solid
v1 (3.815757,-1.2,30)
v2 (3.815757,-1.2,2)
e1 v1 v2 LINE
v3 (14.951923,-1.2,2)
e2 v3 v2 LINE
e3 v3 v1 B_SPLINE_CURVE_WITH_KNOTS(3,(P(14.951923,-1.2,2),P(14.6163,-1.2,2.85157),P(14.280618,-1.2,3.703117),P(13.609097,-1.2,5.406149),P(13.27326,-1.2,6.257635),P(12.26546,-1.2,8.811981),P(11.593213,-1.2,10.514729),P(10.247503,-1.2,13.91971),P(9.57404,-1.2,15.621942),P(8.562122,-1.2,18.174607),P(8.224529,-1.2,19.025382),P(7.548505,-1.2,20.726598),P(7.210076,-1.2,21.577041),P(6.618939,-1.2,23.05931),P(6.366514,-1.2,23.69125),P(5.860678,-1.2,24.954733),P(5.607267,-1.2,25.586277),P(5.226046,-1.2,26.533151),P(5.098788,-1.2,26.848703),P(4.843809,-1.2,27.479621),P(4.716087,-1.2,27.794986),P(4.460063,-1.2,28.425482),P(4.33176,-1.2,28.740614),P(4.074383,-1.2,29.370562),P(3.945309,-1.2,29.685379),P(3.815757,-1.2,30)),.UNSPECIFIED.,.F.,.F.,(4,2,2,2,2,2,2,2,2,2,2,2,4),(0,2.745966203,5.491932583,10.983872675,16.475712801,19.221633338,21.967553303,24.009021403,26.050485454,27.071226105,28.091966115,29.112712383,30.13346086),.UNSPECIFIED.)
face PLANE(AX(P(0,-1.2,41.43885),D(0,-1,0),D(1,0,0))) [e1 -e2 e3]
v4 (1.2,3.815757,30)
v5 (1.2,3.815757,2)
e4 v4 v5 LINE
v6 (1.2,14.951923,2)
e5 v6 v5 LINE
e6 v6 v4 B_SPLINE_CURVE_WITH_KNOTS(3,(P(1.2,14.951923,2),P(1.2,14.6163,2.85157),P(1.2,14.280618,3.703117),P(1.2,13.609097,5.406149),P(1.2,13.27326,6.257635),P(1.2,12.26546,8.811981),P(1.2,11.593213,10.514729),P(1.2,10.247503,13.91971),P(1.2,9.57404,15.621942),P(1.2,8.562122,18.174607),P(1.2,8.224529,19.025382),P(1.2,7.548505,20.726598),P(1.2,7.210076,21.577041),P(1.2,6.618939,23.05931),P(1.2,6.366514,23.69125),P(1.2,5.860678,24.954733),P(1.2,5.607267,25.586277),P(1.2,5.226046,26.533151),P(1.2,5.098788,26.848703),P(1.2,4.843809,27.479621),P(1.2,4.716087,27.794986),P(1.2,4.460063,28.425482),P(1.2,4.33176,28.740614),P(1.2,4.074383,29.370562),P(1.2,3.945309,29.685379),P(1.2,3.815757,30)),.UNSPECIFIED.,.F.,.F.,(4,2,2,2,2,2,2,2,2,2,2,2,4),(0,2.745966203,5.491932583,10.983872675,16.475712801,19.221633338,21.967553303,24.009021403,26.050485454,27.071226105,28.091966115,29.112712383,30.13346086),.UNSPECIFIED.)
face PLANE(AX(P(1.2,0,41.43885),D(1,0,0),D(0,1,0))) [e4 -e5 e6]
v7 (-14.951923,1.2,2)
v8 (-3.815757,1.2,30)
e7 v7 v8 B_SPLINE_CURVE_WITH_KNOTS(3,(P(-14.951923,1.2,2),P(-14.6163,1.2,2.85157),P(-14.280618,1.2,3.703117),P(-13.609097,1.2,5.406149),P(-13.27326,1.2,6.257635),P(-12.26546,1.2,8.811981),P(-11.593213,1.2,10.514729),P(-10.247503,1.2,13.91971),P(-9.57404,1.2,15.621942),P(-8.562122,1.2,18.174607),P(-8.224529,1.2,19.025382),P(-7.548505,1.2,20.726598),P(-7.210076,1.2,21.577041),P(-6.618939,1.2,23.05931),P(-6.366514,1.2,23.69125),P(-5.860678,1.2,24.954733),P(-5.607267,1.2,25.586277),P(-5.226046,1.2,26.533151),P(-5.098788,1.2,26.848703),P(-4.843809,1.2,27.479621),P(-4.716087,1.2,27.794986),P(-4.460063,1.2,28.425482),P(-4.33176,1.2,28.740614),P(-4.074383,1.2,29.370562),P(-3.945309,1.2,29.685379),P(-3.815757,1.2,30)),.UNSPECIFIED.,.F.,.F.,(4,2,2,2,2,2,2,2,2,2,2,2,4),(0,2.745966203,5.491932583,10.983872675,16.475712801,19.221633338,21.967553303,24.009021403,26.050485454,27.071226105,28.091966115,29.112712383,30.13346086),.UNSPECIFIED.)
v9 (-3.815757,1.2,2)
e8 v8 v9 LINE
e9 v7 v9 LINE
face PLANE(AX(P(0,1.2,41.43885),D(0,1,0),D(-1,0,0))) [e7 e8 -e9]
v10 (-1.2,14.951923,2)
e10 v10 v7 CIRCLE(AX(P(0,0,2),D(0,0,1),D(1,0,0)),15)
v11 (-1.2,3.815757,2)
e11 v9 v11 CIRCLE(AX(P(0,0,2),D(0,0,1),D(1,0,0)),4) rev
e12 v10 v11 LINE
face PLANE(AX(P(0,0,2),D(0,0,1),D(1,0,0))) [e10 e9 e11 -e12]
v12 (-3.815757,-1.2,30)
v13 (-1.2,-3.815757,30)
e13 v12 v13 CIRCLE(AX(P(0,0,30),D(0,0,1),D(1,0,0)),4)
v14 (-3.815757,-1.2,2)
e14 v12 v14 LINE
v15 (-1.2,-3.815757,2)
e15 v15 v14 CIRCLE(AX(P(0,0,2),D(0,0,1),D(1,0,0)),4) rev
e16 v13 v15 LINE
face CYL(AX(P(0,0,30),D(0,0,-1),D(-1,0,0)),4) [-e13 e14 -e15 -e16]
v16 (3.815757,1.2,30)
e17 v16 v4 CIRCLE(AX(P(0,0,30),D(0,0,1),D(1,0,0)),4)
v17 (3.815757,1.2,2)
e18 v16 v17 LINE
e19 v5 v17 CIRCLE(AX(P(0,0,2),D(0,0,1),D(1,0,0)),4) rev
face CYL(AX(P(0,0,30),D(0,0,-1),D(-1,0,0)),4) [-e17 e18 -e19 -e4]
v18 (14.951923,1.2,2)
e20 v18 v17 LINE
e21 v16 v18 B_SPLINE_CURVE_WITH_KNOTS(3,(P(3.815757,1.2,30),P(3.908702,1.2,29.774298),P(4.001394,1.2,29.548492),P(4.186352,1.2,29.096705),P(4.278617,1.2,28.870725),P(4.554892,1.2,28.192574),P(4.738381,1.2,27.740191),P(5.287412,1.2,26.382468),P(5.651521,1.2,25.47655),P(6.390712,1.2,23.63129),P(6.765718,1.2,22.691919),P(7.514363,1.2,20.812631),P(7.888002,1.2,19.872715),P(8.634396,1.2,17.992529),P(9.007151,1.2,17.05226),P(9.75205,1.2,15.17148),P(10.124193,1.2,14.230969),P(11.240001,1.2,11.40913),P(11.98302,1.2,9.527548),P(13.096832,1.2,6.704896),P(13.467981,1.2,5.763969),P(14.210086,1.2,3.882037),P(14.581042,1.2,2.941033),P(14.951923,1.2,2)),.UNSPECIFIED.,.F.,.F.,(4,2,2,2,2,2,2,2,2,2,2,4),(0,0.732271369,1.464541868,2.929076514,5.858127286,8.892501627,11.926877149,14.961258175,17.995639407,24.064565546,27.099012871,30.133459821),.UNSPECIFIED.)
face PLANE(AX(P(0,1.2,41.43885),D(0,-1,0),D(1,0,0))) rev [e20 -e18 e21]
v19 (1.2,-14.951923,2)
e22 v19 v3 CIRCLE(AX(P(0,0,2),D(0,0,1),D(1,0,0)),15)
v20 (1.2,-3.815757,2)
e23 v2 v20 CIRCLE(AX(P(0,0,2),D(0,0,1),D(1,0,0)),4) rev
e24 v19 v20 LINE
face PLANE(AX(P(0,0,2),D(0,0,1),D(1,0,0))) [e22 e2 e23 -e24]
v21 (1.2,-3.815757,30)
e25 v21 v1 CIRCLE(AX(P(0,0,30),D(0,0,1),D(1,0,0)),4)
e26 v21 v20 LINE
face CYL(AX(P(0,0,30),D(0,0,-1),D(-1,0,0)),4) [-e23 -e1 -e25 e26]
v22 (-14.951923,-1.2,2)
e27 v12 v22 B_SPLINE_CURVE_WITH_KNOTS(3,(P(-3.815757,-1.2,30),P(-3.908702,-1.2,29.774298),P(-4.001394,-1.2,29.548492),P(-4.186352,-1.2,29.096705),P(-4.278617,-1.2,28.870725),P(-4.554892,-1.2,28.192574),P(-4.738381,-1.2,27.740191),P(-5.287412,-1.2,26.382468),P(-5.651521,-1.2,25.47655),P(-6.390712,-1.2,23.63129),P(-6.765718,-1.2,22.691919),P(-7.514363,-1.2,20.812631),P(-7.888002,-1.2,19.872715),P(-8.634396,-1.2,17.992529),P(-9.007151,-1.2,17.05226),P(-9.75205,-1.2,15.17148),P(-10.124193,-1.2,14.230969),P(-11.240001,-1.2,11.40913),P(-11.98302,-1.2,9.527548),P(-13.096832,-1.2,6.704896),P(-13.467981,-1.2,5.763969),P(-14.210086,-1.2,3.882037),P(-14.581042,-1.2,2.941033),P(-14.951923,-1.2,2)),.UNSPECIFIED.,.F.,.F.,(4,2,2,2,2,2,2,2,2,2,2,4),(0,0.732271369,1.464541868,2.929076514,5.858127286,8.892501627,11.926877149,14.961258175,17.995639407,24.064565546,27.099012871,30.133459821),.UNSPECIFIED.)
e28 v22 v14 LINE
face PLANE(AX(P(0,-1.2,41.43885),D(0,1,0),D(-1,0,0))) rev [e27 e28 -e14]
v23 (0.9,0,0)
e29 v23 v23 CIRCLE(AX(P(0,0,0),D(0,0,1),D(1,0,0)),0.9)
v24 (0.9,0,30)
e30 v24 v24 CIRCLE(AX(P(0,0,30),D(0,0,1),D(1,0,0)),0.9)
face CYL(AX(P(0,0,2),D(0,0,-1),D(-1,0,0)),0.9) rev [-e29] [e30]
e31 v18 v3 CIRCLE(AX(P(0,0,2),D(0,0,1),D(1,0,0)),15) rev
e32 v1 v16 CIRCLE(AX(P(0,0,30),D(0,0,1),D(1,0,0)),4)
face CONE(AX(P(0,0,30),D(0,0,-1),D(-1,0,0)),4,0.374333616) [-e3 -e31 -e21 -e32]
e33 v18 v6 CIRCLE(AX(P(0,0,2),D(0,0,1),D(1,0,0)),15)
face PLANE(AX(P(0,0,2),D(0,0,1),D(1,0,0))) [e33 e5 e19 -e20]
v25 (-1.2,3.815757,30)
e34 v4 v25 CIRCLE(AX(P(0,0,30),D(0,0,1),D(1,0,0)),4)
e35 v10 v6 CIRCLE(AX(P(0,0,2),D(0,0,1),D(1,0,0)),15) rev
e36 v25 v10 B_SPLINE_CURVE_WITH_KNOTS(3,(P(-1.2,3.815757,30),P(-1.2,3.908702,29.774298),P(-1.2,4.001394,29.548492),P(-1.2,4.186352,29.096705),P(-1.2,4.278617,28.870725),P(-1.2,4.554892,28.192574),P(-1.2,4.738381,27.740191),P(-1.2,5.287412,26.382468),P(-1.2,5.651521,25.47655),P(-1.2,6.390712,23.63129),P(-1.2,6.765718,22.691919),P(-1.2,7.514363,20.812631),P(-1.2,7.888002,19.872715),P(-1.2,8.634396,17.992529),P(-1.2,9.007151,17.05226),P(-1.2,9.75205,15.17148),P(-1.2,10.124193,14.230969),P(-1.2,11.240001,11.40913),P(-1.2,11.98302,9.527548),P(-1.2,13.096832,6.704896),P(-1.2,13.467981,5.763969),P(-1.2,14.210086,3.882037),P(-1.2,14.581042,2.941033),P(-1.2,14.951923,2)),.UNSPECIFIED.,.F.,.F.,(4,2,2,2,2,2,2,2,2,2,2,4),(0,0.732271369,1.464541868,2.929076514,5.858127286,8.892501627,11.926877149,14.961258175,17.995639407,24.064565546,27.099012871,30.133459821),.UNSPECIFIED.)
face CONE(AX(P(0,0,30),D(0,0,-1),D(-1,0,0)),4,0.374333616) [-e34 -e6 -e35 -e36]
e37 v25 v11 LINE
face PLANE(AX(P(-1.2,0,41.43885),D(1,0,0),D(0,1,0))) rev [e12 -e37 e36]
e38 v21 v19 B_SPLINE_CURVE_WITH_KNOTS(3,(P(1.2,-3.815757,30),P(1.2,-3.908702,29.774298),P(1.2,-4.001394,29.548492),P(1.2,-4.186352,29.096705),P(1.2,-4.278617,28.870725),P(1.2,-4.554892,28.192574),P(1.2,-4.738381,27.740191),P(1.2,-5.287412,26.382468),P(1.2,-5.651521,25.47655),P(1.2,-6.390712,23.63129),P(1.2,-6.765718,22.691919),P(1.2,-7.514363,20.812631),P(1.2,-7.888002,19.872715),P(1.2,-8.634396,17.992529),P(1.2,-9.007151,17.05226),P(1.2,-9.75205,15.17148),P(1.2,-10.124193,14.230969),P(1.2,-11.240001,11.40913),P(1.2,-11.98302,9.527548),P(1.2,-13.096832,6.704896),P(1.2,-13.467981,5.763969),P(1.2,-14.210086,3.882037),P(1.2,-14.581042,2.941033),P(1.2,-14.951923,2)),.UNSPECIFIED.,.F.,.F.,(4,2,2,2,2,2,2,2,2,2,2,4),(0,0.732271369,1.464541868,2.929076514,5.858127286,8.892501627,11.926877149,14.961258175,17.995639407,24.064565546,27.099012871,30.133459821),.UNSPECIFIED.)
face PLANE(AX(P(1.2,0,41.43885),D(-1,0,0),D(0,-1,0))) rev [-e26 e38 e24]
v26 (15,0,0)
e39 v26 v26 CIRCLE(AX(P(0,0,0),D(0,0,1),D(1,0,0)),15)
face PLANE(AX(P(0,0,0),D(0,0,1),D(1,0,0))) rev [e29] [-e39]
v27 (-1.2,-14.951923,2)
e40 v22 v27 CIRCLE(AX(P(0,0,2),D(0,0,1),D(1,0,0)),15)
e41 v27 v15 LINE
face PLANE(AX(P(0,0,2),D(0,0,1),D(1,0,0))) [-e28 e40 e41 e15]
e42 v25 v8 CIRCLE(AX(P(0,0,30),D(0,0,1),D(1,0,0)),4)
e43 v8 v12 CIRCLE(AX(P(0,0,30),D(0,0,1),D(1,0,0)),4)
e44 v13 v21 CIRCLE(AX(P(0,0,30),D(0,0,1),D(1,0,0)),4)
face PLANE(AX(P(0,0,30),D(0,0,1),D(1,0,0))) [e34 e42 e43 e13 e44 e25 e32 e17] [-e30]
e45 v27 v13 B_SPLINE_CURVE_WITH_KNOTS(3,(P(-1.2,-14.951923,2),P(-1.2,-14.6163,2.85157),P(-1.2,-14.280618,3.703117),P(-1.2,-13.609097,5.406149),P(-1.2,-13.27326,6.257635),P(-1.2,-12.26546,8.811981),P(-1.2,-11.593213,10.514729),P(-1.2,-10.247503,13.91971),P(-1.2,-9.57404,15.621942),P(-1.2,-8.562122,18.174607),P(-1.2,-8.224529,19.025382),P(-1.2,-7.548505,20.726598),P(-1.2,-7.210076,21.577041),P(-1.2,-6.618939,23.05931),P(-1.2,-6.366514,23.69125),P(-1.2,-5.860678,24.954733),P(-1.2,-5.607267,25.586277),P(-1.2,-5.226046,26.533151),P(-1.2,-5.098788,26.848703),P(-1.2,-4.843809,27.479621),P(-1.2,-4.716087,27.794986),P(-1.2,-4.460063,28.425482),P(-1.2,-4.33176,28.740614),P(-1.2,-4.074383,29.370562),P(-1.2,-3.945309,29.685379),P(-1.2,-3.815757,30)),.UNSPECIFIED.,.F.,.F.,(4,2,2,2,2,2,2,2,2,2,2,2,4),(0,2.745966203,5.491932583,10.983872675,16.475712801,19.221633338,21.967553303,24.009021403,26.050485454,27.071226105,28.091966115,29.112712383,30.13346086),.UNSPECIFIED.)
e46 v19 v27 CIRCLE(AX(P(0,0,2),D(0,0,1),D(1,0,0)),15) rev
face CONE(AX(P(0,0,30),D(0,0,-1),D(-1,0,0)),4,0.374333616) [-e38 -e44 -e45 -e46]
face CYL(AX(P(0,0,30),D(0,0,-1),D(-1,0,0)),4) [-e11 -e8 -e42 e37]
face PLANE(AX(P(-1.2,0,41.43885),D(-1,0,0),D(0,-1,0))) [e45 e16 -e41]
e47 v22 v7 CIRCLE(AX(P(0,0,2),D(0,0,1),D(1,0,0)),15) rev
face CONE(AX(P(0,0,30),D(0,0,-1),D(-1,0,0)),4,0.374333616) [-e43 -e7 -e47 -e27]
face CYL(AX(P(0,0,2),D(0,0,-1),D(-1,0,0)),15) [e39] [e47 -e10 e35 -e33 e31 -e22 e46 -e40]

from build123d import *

# Parameters (mm, degrees)
SKETCH1_R           = 15
SKETCH1_R_2         = 0.9
BOSS_EXTRUDE1_DEPTH = 2
SKETCH1_3_R         = 4
SKETCH1_3_R_2       = 0.9
BOSS_EXTRUDE2_DEPTH = 30
BOSS_EXTRUDE3_DEPTH = 28
CHAMFER1_SIZE       = 28
CHAMFER1_SIZE_2     = 11


with BuildPart() as part:
    # Sketch1 → Boss-Extrude1 (new body)
    with BuildSketch(Plane.XY):
        Circle(SKETCH1_R)
        Circle(SKETCH1_R_2, mode=Mode.SUBTRACT)
    extrude(amount=BOSS_EXTRUDE1_DEPTH)

    # Sketch1<3> → Boss-Extrude2 (add)
    with BuildSketch(Plane.XY):
        Circle(SKETCH1_3_R)
        Circle(SKETCH1_3_R_2, mode=Mode.SUBTRACT)
    extrude(amount=BOSS_EXTRUDE2_DEPTH)

    # Sketch2 → Boss-Extrude3 (add)
    with BuildSketch(Plane.XY.offset(2)):
        with BuildLine():
            ThreePointArc((1.2, 14.951922953), (0, 15), (-1.2, 14.951922953))
            Line((-1.2, 14.951922953), (-1.2, 3.815756806))
            ThreePointArc((-1.2, 3.815756806), (0, 4), (1.2, 3.815756806))
            Line((1.2, 3.815756806), (1.2, 14.951922953))
        make_face()
        with BuildLine():
            Line((-3.815756806, 1.2), (-14.951922953, 1.2))
            ThreePointArc((-14.951922953, 1.2), (-15, 0), (-14.951922953, -1.2))
            Line((-14.951922953, -1.2), (-3.815756806, -1.2))
            ThreePointArc((-3.815756806, -1.2), (-4, 0), (-3.815756806, 1.2))
        make_face()
        with BuildLine():
            ThreePointArc((14.951922953, -1.2), (15, 0), (14.951922953, 1.2))
            Line((14.951922953, 1.2), (3.815756806, 1.2))
            ThreePointArc((3.815756806, 1.2), (4, 0), (3.815756806, -1.2))
            Line((3.815756806, -1.2), (14.951922953, -1.2))
        make_face()
        with BuildLine():
            Line((-1.2, -3.815756806), (-1.2, -14.951922953))
            ThreePointArc((-1.2, -14.951922953), (0, -15), (1.2, -14.951922953))
            Line((1.2, -14.951922953), (1.2, -3.815756806))
            ThreePointArc((1.2, -3.815756806), (0, -4), (-1.2, -3.815756806))
        make_face()
    extrude(amount=BOSS_EXTRUDE3_DEPTH)

    # Chamfer1
    # the kernel refuses this chamfer: 28, 11 mm, written as the material it takes off along each edge
    with BuildSketch(Plane(origin=(0, 0, 30), x_dir=(0.9999950652018581, 0.0031415874858912577, 0), z_dir=(0.0031415874858912577, -0.9999950652018581, 0))) as chamfer1_piece_1:
        Polygon((15, -CHAMFER1_SIZE), (15 - CHAMFER1_SIZE_2, 0), (15, 0), align=None)
    revolve(axis=Axis((0, 0, 30), (0, 0, 1)), revolution_arc=359.64, mode=Mode.SUBTRACT)
    with BuildSketch(Plane(origin=(0, 0, 30), x_dir=(0.0031415874858795345, -0.9999950652018582, 0), z_dir=(-0.9999950652018582, -0.0031415874858795345, 0))) as chamfer1_piece_2:
        Polygon((15, -CHAMFER1_SIZE), (15 - CHAMFER1_SIZE_2, 0), (15, 0), align=None)
    revolve(axis=Axis((0, 0, 30), (0, 0, 1)), revolution_arc=359.64, mode=Mode.SUBTRACT)
    with BuildSketch(Plane(origin=(0, 0, 30), x_dir=(-0.9999950652018582, -0.00314158748587628, 0), z_dir=(-0.00314158748587628, 0.9999950652018582, 0))) as chamfer1_piece_3:
        Polygon((15, -CHAMFER1_SIZE), (15 - CHAMFER1_SIZE_2, 0), (15, 0), align=None)
    revolve(axis=Axis((0, 0, 30), (0, 0, 1)), revolution_arc=359.64, mode=Mode.SUBTRACT)
    with BuildSketch(Plane(origin=(0, 0, 30), x_dir=(-0.003141587485897415, 0.9999950652018581, 0), z_dir=(0.9999950652018581, 0.003141587485897415, 0))) as chamfer1_piece_4:
        Polygon((15, -CHAMFER1_SIZE), (15 - CHAMFER1_SIZE_2, 0), (15, 0), align=None)
    revolve(axis=Axis((0, 0, 30), (0, 0, 1)), revolution_arc=359.64, mode=Mode.SUBTRACT)


solid = part.part
